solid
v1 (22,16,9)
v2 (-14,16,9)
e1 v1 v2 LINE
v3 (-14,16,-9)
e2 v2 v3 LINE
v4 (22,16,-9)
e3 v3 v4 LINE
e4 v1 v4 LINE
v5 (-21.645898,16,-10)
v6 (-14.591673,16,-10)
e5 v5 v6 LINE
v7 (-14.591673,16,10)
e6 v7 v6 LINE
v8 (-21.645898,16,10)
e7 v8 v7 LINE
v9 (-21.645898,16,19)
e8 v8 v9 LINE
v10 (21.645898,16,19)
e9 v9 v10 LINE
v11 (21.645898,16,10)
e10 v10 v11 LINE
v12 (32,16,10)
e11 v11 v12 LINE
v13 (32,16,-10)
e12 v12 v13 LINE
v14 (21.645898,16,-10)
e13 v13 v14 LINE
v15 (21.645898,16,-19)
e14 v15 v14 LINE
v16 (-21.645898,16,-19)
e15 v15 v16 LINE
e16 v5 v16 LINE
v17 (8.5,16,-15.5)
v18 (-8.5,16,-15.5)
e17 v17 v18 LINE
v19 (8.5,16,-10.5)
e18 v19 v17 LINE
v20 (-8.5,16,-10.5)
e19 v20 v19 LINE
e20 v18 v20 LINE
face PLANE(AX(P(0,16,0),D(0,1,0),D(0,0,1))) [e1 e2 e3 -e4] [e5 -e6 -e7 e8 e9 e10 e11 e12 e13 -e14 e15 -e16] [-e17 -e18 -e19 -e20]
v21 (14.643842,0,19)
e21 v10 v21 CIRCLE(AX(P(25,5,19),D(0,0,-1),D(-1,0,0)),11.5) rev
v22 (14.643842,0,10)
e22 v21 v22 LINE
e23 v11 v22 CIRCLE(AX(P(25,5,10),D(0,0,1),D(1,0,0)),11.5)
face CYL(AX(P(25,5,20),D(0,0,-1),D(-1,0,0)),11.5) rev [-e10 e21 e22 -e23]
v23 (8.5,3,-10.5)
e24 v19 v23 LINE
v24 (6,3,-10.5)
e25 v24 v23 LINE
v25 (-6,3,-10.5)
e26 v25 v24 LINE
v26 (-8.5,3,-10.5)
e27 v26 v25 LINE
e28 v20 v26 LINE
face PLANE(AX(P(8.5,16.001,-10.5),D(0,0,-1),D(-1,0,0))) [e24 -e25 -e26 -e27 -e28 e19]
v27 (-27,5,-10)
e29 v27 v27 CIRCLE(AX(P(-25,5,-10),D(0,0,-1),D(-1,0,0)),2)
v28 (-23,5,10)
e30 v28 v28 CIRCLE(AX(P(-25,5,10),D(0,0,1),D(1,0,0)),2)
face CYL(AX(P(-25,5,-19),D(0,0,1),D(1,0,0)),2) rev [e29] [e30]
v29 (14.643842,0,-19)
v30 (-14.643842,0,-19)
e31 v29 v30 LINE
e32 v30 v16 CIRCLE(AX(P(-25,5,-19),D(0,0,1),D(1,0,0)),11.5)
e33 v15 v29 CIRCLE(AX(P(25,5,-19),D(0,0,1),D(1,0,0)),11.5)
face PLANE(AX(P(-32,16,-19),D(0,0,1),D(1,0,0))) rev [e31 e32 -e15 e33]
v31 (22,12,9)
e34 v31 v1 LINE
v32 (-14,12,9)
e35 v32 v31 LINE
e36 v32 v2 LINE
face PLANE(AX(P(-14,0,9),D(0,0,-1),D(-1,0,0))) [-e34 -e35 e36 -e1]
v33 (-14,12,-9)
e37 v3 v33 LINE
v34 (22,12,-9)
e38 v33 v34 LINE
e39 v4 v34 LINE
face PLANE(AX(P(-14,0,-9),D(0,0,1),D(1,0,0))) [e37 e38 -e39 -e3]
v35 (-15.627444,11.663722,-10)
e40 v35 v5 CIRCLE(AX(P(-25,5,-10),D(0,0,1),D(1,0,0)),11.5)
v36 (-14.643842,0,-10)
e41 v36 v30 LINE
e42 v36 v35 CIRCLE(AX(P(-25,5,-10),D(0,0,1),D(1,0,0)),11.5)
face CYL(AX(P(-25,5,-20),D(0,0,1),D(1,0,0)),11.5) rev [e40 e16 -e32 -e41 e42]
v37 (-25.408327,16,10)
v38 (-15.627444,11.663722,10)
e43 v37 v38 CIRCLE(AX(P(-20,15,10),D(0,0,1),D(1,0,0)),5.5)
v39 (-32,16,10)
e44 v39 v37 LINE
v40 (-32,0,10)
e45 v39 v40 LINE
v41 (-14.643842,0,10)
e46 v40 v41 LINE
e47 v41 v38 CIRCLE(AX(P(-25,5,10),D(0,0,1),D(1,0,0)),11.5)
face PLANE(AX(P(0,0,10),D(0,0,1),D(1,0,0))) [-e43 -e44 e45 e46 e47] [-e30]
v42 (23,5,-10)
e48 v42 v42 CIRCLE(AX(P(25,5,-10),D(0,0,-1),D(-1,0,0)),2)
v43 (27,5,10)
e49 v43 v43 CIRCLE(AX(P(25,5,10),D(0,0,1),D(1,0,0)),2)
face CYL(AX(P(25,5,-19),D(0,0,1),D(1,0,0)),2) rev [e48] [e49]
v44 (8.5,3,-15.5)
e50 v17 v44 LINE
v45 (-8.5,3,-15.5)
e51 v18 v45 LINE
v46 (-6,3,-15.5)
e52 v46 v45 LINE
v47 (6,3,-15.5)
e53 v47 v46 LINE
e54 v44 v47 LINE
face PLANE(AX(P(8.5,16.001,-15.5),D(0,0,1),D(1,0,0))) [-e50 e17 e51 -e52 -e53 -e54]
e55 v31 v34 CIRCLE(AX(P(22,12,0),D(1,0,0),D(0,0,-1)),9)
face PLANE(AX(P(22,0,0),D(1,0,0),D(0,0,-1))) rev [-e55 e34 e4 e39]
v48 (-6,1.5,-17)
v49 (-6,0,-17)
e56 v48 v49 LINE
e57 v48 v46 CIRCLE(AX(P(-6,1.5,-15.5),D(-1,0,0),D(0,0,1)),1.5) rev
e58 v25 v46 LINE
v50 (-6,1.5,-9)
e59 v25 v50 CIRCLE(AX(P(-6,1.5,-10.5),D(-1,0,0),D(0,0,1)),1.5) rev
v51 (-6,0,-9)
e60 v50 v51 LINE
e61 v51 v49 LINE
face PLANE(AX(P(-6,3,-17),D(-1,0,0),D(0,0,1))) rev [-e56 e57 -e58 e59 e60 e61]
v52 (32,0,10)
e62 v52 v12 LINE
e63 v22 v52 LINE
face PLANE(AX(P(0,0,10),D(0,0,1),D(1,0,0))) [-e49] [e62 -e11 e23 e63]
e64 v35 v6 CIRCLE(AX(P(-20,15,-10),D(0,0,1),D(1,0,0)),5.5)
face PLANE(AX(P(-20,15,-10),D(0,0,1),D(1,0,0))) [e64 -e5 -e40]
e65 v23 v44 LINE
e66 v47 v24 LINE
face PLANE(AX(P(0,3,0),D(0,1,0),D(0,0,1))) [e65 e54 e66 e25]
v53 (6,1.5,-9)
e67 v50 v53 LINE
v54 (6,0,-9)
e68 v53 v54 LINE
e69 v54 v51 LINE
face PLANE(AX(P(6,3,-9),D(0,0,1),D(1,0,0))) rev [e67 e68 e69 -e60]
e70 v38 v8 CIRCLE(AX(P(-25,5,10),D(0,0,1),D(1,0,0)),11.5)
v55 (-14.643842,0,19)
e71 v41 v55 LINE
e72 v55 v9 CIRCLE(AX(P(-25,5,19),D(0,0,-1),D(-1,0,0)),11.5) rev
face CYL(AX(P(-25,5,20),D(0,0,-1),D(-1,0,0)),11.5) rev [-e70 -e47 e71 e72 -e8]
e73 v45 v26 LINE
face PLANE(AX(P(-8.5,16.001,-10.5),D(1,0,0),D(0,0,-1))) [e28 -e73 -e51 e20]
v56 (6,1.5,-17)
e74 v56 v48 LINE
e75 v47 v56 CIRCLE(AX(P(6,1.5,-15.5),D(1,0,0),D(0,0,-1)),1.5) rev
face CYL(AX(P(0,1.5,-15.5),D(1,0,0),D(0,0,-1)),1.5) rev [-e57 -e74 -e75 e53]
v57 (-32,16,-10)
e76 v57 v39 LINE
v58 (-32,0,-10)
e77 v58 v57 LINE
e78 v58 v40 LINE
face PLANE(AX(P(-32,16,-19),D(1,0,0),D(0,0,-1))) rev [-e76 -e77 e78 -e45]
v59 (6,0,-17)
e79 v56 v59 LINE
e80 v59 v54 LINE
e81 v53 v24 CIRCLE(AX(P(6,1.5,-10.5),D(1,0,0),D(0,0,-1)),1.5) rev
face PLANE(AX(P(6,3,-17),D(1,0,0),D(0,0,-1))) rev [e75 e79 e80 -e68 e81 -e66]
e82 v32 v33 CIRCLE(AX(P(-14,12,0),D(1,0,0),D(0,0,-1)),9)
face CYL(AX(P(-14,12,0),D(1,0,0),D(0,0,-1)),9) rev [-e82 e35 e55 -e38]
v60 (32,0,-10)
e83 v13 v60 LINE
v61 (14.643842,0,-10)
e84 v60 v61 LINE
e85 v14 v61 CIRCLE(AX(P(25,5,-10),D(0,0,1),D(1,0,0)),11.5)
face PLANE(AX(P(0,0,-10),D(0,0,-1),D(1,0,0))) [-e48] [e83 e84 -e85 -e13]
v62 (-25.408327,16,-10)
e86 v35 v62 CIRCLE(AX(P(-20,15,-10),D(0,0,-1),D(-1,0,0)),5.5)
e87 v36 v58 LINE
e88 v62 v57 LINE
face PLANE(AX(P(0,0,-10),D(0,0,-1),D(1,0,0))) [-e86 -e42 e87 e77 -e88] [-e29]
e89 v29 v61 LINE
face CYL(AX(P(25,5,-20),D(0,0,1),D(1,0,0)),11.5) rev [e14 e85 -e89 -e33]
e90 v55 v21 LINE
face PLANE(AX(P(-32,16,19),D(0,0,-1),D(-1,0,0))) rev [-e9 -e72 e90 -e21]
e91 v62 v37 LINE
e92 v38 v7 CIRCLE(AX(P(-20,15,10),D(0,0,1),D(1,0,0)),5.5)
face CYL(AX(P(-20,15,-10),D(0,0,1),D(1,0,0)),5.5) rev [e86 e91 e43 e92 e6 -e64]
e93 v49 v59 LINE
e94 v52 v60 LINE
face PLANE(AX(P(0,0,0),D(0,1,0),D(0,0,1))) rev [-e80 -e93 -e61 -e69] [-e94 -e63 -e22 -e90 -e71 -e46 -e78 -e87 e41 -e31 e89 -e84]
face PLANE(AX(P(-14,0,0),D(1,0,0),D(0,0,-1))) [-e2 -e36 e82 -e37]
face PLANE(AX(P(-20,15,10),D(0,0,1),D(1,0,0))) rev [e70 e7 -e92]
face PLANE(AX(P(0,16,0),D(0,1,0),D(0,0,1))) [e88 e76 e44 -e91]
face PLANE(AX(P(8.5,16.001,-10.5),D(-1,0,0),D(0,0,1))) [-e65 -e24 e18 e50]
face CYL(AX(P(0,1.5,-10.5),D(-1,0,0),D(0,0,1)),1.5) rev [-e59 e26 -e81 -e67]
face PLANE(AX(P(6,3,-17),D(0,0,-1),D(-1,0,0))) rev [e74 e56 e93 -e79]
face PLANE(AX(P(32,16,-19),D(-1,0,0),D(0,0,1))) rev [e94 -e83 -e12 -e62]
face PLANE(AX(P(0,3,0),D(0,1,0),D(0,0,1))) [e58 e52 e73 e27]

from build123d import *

# Parameters (mm, degrees)
SKETCH1_W               = 64
SKETCH1_H               = 38
BOSS_EXTRUDE1_DEPTH     = 16
CUT_EXTRUDE2_START      = 10
SKETCH3_R               = 11.5
CUT_EXTRUDE2_DEPTH      = 10
CUT_EXTRUDE3_DEPTH      = 41.509258201
CUT_EXTRUDE3_DEPTH_BACK = 41.509258201
SKETCH5_R               = 2
BATTERY_DEPTH           = 22
BATTERY_DEPTH_BACK      = 14
SKETCH4_R               = 9
CUT_EXTRUDE4_REACH      = 45.509
CUT_EXTRUDE4_START      = 3
SKETCH6_W               = 17
SKETCH6_H               = 5
SKETCH7_W               = 12
SKETCH7_H               = 8
CUT_EXTRUDE5_DEPTH      = 3
FILLET1_R               = 1.5
SKETCH8_R               = 5.5
CUT_EXTRUDE6_DEPTH      = 10


with BuildPart() as part:
    # Sketch1 → Boss-Extrude1 (new body)
    with BuildSketch(Plane(origin=(0, 0, 0), x_dir=(1, 0, 0), z_dir=(0, 1, 0))):
        Rectangle(SKETCH1_W, SKETCH1_H)
    extrude(amount=BOSS_EXTRUDE1_DEPTH)

    # Sketch3 → Cut-Extrude2 (cut)
    with BuildSketch(Plane.XY.offset(CUT_EXTRUDE2_START)):
        with BuildLine():
            Line((36.5, -6.5), (36.5, 5))
            ThreePointArc((36.5, 5), (33.131727984, -3.131727984), (25, -6.5))
            Line((25, -6.5), (36.5, -6.5))
        make_face()
        with Locations((25, 5)):
            Circle(SKETCH3_R)
        with BuildLine():
            Line((36.5, 16.5), (25, 16.5))
            ThreePointArc((25, 16.5), (33.131727984, 13.131727984), (36.5, 5))
            Line((36.5, 5), (36.5, 16.5))
        make_face()
        with Locations((-25, 5)):
            Circle(SKETCH3_R)
        with BuildLine():
            Line((-36.5, -6.5), (-25, -6.5))
            ThreePointArc((-25, -6.5), (-33.131727957, -3.13172801), (-36.5, 4.999999925))
            Line((-36.5, 4.999999925), (-36.5, -6.5))
        make_face()
        with BuildLine():
            Line((-36.5, 16.5), (-36.5, 4.999999925))
            ThreePointArc((-36.5, 4.999999925), (-33.13172801, 13.131727957), (-25, 16.5))
            Line((-25, 16.5), (-36.5, 16.5))
        make_face()
    cut_extrude2 = extrude(amount=CUT_EXTRUDE2_DEPTH, mode=Mode.SUBTRACT)

    # Mirror1: Cut-Extrude2 across plane
    add(cut_extrude2.mirror(Plane.XY), mode=Mode.SUBTRACT)

    # Sketch5 → Cut-Extrude3 (cut, two sides: drawn at the far end of the back side and taken through both)
    with BuildSketch(Plane.XY.offset(-CUT_EXTRUDE3_DEPTH_BACK)):
        with Locations((25, 5)):
            Circle(SKETCH5_R)
        with Locations((-25, 5)):
            Circle(SKETCH5_R)
    extrude(amount=CUT_EXTRUDE3_DEPTH + CUT_EXTRUDE3_DEPTH_BACK, mode=Mode.SUBTRACT)


with BuildPart() as body_2:
    # Sketch4 → Battery (new, two sides: drawn at the far end of the back side and taken through both)
    with BuildSketch(Plane(origin=(0, 0, 0), x_dir=(0, 0, -1), z_dir=(1, 0, 0)).offset(-BATTERY_DEPTH_BACK)):
        with Locations((0, 12)):
            Circle(SKETCH4_R)
        with BuildLine():
            Line((-9, 23.052760149), (-9, 12))
            ThreePointArc((-9, 12), (0, 21), (9, 12))
            Line((9, 12), (9, 23.052760149))
            Line((9, 23.052760149), (-9, 23.052760149))
        make_face()
    extrude(amount=BATTERY_DEPTH + BATTERY_DEPTH_BACK)


with BuildPart() as part_1:
    add(part.part)

    # Combine1: cut body 2
    add(body_2.part, mode=Mode.SUBTRACT)

    # Sketch6 → Cut-Extrude4 (cut, up to next)
    with BuildSketch(Plane(origin=(0, 0, 0), x_dir=(1, 0, 0), z_dir=(0, 1, 0)).offset(CUT_EXTRUDE4_START), mode=Mode.PRIVATE) as cut_extrude4_sk1:
        with Locations((0, 13)):
            Rectangle(SKETCH6_W, SKETCH6_H)
    cut_extrude4_tool1 = extrude(cut_extrude4_sk1.sketch, amount=CUT_EXTRUDE4_REACH, mode=Mode.PRIVATE) & part_1.part
    add(cut_extrude4_tool1.solids().sort_by_distance((0, 3, -13))[0], mode=Mode.SUBTRACT)

    # Sketch7 → Cut-Extrude5 (cut)
    with BuildSketch(Plane.XZ):
        with Locations((0, -13)):
            Rectangle(SKETCH7_W, SKETCH7_H)
    extrude(amount=-CUT_EXTRUDE5_DEPTH, mode=Mode.SUBTRACT)

    # Fillet1
    fillet1_edges = [part_1.edges().sort_by_distance(p)[0] for p in [
        (0, 3, -17),
        (0, 3, -9),
    ]]
    fillet(fillet1_edges, radius=FILLET1_R - 0.0001)  # a hair under: the kernel refuses the full size

    # Sketch8 → Cut-Extrude6 (cut, symmetric)
    with BuildSketch(Plane.XY):
        with Locations((-20, 15)):
            Circle(SKETCH8_R)
    extrude(amount=CUT_EXTRUDE6_DEPTH, both=True, mode=Mode.SUBTRACT)


solid = part_1.part
